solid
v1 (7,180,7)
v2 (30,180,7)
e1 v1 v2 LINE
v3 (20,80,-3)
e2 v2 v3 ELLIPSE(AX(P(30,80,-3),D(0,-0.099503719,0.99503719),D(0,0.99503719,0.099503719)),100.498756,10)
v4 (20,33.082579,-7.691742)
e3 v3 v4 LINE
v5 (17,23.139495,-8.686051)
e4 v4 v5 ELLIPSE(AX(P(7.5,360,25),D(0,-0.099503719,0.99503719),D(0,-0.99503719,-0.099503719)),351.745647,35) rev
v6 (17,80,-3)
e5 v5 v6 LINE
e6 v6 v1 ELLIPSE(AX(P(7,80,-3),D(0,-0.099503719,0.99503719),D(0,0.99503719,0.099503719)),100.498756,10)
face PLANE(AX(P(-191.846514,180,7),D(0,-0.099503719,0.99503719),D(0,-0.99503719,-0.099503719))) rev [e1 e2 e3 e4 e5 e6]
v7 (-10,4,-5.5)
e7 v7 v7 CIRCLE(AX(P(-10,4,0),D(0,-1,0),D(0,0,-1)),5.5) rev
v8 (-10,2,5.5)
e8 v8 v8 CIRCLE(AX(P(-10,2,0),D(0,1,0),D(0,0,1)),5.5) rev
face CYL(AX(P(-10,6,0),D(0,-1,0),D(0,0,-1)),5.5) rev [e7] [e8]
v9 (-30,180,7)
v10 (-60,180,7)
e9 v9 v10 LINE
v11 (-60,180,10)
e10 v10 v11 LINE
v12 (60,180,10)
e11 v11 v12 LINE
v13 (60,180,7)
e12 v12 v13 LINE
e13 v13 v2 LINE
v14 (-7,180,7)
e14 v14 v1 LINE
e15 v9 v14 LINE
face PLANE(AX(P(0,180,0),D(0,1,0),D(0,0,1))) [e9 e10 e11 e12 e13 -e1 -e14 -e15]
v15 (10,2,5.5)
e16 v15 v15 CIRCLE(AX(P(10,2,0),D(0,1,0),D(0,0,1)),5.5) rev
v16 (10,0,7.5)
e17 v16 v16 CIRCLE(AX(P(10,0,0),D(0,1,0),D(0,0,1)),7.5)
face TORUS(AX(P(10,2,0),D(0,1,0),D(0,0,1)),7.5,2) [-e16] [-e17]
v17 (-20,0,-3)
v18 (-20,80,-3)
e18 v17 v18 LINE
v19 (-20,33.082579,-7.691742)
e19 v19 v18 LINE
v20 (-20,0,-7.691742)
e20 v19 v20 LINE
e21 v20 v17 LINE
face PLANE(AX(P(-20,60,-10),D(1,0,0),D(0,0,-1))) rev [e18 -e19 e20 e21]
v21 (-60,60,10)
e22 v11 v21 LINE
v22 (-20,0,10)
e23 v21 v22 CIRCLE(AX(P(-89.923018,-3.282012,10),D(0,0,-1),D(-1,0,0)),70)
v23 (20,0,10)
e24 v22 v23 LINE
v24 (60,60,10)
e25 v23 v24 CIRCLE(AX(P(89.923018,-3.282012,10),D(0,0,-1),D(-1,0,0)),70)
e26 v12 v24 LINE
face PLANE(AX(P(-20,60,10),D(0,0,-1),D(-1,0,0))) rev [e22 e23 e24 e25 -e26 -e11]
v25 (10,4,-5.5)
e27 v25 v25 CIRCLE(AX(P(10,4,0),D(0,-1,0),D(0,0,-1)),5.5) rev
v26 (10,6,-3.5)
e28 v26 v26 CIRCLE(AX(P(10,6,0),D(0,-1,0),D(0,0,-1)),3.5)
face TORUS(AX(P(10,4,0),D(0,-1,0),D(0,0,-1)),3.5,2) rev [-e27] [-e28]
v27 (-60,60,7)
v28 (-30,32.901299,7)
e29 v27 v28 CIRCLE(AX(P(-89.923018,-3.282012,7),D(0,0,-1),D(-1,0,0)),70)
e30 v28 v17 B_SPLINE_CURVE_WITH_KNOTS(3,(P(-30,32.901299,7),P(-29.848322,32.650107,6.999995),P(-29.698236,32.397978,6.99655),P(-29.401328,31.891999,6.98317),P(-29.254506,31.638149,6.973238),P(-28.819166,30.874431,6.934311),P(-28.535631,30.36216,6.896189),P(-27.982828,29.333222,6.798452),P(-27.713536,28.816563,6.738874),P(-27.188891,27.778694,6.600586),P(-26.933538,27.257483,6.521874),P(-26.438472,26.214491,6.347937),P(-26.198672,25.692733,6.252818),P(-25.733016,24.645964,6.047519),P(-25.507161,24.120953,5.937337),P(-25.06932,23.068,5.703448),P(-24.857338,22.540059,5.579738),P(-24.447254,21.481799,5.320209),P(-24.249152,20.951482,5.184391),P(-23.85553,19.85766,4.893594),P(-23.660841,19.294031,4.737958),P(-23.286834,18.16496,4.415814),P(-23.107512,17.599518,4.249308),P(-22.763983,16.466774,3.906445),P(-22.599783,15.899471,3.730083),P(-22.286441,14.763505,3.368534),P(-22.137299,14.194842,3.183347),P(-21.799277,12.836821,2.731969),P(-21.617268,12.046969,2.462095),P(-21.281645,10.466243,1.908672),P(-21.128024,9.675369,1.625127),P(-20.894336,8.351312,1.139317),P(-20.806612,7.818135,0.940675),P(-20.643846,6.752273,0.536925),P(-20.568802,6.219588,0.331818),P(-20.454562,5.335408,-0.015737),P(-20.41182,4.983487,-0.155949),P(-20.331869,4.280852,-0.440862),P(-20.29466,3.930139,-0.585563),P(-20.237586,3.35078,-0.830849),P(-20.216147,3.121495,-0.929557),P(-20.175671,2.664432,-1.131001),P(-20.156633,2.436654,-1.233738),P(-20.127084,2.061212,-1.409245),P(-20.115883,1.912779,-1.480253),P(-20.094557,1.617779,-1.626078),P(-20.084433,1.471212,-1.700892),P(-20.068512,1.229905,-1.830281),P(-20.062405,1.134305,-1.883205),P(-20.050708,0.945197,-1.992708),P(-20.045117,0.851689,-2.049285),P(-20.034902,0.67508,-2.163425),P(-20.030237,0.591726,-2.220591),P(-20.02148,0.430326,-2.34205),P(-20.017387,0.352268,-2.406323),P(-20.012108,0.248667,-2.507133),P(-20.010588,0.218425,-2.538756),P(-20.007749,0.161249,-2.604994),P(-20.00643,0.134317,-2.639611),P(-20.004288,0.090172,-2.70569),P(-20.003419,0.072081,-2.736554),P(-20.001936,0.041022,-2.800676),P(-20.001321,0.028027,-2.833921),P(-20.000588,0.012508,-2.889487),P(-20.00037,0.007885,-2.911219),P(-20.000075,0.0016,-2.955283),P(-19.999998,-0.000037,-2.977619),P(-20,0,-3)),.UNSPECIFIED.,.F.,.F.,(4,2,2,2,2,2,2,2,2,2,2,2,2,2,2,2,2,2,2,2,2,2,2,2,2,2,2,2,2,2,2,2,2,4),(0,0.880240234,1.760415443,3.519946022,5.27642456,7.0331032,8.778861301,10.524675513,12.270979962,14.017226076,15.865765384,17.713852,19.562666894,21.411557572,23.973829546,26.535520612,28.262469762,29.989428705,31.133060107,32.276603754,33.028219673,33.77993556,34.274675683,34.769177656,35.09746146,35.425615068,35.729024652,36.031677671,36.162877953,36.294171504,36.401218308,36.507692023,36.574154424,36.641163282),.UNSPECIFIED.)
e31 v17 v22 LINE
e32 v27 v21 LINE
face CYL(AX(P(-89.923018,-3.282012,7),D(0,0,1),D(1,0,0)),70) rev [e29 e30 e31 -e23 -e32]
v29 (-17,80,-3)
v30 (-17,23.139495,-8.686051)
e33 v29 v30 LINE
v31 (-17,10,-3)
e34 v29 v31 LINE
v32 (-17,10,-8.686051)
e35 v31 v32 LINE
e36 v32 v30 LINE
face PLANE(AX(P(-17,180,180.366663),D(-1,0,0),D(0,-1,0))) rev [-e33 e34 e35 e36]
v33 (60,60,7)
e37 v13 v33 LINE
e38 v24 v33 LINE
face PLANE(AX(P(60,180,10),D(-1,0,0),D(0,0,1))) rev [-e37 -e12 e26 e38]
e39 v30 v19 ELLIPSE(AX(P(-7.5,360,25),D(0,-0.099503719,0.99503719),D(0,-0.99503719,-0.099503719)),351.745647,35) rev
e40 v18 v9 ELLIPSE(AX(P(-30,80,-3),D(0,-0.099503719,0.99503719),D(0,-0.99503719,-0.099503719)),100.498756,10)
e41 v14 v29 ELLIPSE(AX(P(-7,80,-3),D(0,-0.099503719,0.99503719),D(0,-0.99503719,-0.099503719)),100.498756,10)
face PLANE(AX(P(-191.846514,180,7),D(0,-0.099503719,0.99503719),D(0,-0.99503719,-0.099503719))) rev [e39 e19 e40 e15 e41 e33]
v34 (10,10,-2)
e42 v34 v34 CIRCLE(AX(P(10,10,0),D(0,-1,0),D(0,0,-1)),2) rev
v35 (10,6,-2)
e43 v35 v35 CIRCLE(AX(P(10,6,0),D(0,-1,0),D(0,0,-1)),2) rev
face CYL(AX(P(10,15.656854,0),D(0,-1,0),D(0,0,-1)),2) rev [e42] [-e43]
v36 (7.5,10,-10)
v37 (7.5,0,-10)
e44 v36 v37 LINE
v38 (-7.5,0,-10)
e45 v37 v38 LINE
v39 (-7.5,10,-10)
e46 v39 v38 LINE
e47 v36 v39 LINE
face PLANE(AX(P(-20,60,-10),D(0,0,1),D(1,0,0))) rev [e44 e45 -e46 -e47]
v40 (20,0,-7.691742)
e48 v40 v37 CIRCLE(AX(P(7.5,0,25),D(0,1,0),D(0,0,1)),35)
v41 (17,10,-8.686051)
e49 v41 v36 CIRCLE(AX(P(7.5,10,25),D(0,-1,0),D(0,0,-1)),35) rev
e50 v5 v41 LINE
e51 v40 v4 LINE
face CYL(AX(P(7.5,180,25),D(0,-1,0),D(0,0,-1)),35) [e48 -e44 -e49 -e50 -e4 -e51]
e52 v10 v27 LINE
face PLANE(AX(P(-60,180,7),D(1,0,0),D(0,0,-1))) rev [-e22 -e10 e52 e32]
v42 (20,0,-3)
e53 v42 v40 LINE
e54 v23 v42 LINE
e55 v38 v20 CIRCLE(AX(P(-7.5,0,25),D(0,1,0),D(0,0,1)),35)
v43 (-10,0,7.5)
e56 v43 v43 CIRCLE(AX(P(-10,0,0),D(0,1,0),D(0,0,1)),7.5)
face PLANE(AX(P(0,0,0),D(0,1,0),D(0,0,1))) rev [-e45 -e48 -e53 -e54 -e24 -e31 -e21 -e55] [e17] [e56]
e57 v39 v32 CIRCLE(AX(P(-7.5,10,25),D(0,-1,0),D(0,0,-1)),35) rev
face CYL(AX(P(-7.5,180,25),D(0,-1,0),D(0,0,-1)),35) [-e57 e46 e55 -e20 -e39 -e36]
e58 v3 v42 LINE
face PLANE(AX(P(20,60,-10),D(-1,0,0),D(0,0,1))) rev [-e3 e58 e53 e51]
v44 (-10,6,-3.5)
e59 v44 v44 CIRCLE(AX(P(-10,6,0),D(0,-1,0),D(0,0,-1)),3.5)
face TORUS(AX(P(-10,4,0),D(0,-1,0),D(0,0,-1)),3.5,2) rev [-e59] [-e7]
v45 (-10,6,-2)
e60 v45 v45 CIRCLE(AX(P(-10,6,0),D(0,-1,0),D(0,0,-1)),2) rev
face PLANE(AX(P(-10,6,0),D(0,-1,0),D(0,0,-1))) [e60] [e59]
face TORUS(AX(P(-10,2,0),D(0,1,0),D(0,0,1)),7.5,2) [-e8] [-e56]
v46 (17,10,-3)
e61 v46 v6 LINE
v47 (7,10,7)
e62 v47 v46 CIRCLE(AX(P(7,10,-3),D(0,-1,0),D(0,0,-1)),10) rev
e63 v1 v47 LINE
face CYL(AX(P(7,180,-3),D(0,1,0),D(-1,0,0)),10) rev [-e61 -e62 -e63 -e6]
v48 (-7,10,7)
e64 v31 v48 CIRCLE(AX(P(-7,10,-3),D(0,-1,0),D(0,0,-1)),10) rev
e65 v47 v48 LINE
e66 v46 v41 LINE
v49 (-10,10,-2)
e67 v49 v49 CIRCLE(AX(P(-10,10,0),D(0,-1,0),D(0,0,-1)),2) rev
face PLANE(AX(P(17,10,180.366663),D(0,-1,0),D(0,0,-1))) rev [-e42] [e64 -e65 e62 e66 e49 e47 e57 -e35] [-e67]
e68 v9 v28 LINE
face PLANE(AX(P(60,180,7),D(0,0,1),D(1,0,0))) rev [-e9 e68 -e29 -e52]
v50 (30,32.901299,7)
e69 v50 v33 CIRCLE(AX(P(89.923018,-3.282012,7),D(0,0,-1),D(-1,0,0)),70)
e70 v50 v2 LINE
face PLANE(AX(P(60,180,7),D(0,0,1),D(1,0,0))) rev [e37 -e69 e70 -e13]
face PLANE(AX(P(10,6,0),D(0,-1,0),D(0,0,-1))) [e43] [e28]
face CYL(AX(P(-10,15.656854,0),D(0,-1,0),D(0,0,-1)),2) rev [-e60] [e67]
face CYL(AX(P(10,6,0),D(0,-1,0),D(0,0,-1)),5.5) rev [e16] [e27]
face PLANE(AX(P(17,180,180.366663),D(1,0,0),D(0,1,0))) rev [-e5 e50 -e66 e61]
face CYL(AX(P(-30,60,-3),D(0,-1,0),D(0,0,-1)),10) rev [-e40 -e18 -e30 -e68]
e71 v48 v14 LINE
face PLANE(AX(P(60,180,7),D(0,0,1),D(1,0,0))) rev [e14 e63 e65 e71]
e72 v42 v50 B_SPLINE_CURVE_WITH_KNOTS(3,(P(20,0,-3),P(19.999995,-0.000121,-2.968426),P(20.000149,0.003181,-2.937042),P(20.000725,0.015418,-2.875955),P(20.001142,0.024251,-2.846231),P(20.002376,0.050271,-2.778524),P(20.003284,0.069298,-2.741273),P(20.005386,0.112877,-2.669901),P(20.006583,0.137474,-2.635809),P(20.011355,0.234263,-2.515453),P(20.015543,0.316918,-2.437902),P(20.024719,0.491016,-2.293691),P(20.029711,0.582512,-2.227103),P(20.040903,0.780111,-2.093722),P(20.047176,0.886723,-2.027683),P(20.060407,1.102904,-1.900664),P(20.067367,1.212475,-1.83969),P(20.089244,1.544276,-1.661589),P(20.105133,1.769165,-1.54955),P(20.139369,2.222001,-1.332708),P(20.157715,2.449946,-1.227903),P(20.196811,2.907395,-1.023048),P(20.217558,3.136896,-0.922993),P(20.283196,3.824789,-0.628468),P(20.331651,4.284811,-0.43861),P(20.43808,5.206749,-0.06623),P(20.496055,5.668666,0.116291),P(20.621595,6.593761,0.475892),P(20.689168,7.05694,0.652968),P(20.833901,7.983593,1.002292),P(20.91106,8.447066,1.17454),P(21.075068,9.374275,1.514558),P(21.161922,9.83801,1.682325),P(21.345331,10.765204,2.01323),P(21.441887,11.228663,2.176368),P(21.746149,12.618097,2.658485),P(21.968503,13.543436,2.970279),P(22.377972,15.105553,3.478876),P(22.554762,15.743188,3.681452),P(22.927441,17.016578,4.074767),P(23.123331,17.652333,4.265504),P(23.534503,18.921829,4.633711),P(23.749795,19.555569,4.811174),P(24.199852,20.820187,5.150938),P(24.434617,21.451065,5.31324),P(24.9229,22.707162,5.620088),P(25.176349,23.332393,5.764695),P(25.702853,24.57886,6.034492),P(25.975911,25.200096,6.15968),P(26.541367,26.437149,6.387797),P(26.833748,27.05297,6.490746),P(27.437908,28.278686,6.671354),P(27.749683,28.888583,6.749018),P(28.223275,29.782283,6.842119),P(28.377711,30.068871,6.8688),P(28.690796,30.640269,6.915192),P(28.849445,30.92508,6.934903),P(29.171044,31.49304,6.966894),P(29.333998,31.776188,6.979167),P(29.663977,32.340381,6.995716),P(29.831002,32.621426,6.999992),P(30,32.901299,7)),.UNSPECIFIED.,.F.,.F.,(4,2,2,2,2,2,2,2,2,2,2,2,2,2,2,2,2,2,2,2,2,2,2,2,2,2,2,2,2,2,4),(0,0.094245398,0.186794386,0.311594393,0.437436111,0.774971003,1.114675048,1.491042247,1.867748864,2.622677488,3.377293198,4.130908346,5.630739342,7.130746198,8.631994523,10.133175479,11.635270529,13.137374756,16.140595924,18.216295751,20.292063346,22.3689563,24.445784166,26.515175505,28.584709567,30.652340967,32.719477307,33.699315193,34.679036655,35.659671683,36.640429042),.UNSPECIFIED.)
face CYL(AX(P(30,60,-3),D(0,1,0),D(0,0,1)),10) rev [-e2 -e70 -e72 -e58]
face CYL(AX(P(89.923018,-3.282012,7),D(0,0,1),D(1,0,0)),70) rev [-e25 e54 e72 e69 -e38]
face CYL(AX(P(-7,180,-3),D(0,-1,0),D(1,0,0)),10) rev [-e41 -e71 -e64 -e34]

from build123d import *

# Parameters (mm, degrees)
SZKIC1_W                    = 40
SZKIC1_H                    = 20
DODANIE_WYCI_GNI_CIE1_DEPTH = 60
DODANIE_WYCI_GNI_CIE2_DEPTH = 120
DODANIE_WYCI_GNI_CIE3_DEPTH = 3
SZKIC4_W                    = 40
SZKIC4_H                    = 17
DODANIE_WYCI_GNI_CIE4_DEPTH = 120
WYTNIJ_WYCI_GNI_CIE1_DEPTH  = 40
SZKIC6_W                    = 34
SZKIC6_H                    = 170
WYTNIJ_WYCI_GNI_CIE2_DEPTH  = 17
ZAOKR_GLENIE1_R             = 10
SZKIC7_R                    = 2
WYTNIJ_WYCI_GNI_CIE3_DEPTH  = 10
SZKIC8_R                    = 5.5
WYTNIJ_WYCI_GNI_CIE4_DEPTH  = 6
ZAOKR_GLENIE2_R             = 2
WYTNIJ_WYCI_GNI_CIE5_DEPTH  = 191.000000132


with BuildPart() as part:
    # Szkic1 → Dodanie-wyciągnięcie1 (new body)
    with BuildSketch(Plane(origin=(0, 0, 0), x_dir=(1, 0, 0), z_dir=(0, 1, 0))):
        Rectangle(SZKIC1_W, SZKIC1_H)
    extrude(amount=DODANIE_WYCI_GNI_CIE1_DEPTH)

    # Szkic2 → Dodanie-wyciągnięcie2 (add)
    with BuildSketch(Plane(origin=(0, 60, 0), x_dir=(1, 0, 0), z_dir=(0, 1, 0))):
        Polygon((0, -10), (60, -10), (60, -7), (-60, -7), (-60, -10), align=None)
    extrude(amount=DODANIE_WYCI_GNI_CIE2_DEPTH)

    # Szkic3 → Dodanie-wyciągnięcie3 (add)
    with BuildSketch(Plane.XY.offset(10)):
        with BuildLine():
            Line((-60, 60), (-20, 60))
            Line((-20, 60), (-20, 0))
            ThreePointArc((-20, 0), (-31.679497057, 35.547001962), (-60, 60))
        make_face()
        with BuildLine():
            Line((60, 60), (20, 60))
            Line((20, 60), (20, 0))
            ThreePointArc((20, 0), (31.679497057, 35.547001962), (60, 60))
        make_face()
    extrude(amount=-DODANIE_WYCI_GNI_CIE3_DEPTH)

    # Szkic4 → Dodanie-wyciągnięcie4 (add)
    with BuildSketch(Plane(origin=(0, 60, 0), x_dir=(1, 0, 0), z_dir=(0, 1, 0))):
        with Locations((0, 1.5)):
            Rectangle(SZKIC4_W, SZKIC4_H)
    extrude(amount=DODANIE_WYCI_GNI_CIE4_DEPTH)

    # Szkic5 → Wytnij-wyciągnięcie1 (cut)
    with BuildSketch(Plane(origin=(20, 0, 0), x_dir=(0, 0, -1), z_dir=(1, 0, 0))):
        Polygon((-7, 180), (10, 10), (18.124176292, 10), (18.124176292, 180), align=None)
    extrude(amount=-WYTNIJ_WYCI_GNI_CIE1_DEPTH, mode=Mode.SUBTRACT)

    # Szkic6 → Wytnij-wyciągnięcie2 (cut)
    with BuildSketch(Plane(origin=(0, 0, -10), x_dir=(-1, 0, 0), z_dir=(0, 0, -1))):
        with Locations((0, 95)):
            Rectangle(SZKIC6_W, SZKIC6_H)
    extrude(amount=-WYTNIJ_WYCI_GNI_CIE2_DEPTH, mode=Mode.SUBTRACT)

    # Zaokrąglenie1
    # the kernel refuses this fillet: 10 mm, written as the material it adds along each edge
    with BuildSketch(Plane(origin=(-20, 0, 7), x_dir=(0, 0, -1), z_dir=(0, 1, 0))) as zaokr_glenie1_piece_1_section:
        with BuildLine():
            CenterArc((ZAOKR_GLENIE1_R, ZAOKR_GLENIE1_R), ZAOKR_GLENIE1_R, 180, 90)
            Line((0, ZAOKR_GLENIE1_R), (-ZAOKR_GLENIE1_R * 0.02, ZAOKR_GLENIE1_R))
            Line((-ZAOKR_GLENIE1_R * 0.02, ZAOKR_GLENIE1_R), (-ZAOKR_GLENIE1_R * 0.02, -ZAOKR_GLENIE1_R * 0.02))
            Line((-ZAOKR_GLENIE1_R * 0.02, -ZAOKR_GLENIE1_R * 0.02), (ZAOKR_GLENIE1_R, -ZAOKR_GLENIE1_R * 0.02))
            Line((ZAOKR_GLENIE1_R, -ZAOKR_GLENIE1_R * 0.02), (ZAOKR_GLENIE1_R, 0))
        make_face()
    zaokr_glenie1_piece_1 = extrude(amount=180, mode=Mode.PRIVATE)
    zaokr_glenie1_piece_1 = split(zaokr_glenie1_piece_1, bisect_by=Plane(origin=(-22.33425107, 87.013829457, -2.298617054), z_dir=(0, -0.09950371902099896, 0.9950371902099892)), keep=Keep.TOP, mode=Mode.PRIVATE)
    zaokr_glenie1_piece_1 = zaokr_glenie1_piece_1 - Plane(origin=(-89.92301766, -3.282011774, 4.977489049), x_dir=(0.9989002522895803, 0.04688588247876816, 0), z_dir=(0, 0, 1)) * Cylinder(70, 400, mode=Mode.PRIVATE)
    with BuildSketch(Plane(origin=(20, 180, 7), x_dir=(0, 0, -1), z_dir=(0, -1, 0))) as zaokr_glenie1_piece_2_section:
        with BuildLine():
            CenterArc((ZAOKR_GLENIE1_R, ZAOKR_GLENIE1_R), ZAOKR_GLENIE1_R, 180, 90)
            Line((0, ZAOKR_GLENIE1_R), (-ZAOKR_GLENIE1_R * 0.02, ZAOKR_GLENIE1_R))
            Line((-ZAOKR_GLENIE1_R * 0.02, ZAOKR_GLENIE1_R), (-ZAOKR_GLENIE1_R * 0.02, -ZAOKR_GLENIE1_R * 0.02))
            Line((-ZAOKR_GLENIE1_R * 0.02, -ZAOKR_GLENIE1_R * 0.02), (ZAOKR_GLENIE1_R, -ZAOKR_GLENIE1_R * 0.02))
            Line((ZAOKR_GLENIE1_R, -ZAOKR_GLENIE1_R * 0.02), (ZAOKR_GLENIE1_R, 0))
        make_face()
    zaokr_glenie1_piece_2 = extrude(amount=180, mode=Mode.PRIVATE)
    zaokr_glenie1_piece_2 = split(zaokr_glenie1_piece_2, bisect_by=Plane(origin=(22.33425107, 87.013829456, -2.298617054), z_dir=(0, -0.09950371902099896, 0.9950371902099892)), keep=Keep.TOP, mode=Mode.PRIVATE)
    zaokr_glenie1_piece_2 = zaokr_glenie1_piece_2 - Plane(origin=(89.92301766, -3.282011774, 4.977489049), x_dir=(-0.9989002522895803, 0.046885882478767064, 0), z_dir=(0, 0, 1)) * Cylinder(70, 400, mode=Mode.PRIVATE)
    with BuildSketch(Plane(origin=(-17, 180, 7), x_dir=(0, 0, -1), z_dir=(0, -1, 0))) as zaokr_glenie1_piece_3_section:
        with BuildLine():
            CenterArc((ZAOKR_GLENIE1_R, ZAOKR_GLENIE1_R), ZAOKR_GLENIE1_R, 180, 90)
            Line((0, ZAOKR_GLENIE1_R), (-ZAOKR_GLENIE1_R * 0.02, ZAOKR_GLENIE1_R))
            Line((-ZAOKR_GLENIE1_R * 0.02, ZAOKR_GLENIE1_R), (-ZAOKR_GLENIE1_R * 0.02, -ZAOKR_GLENIE1_R * 0.02))
            Line((-ZAOKR_GLENIE1_R * 0.02, -ZAOKR_GLENIE1_R * 0.02), (ZAOKR_GLENIE1_R, -ZAOKR_GLENIE1_R * 0.02))
            Line((ZAOKR_GLENIE1_R, -ZAOKR_GLENIE1_R * 0.02), (ZAOKR_GLENIE1_R, 0))
        make_face()
    zaokr_glenie1_piece_3 = extrude(amount=170, mode=Mode.PRIVATE)
    zaokr_glenie1_piece_3 = split(zaokr_glenie1_piece_3, bisect_by=Plane(origin=(-14.551056072, 85.950912881, -2.404908712), z_dir=(0, -0.09950371902099896, 0.9950371902099892)), keep=Keep.TOP, mode=Mode.PRIVATE)
    with BuildSketch(Plane(origin=(17, 10, 7), x_dir=(0, 0, -1), z_dir=(0, 1, 0))) as zaokr_glenie1_piece_4_section:
        with BuildLine():
            CenterArc((ZAOKR_GLENIE1_R, ZAOKR_GLENIE1_R), ZAOKR_GLENIE1_R, 180, 90)
            Line((0, ZAOKR_GLENIE1_R), (-ZAOKR_GLENIE1_R * 0.02, ZAOKR_GLENIE1_R))
            Line((-ZAOKR_GLENIE1_R * 0.02, ZAOKR_GLENIE1_R), (-ZAOKR_GLENIE1_R * 0.02, -ZAOKR_GLENIE1_R * 0.02))
            Line((-ZAOKR_GLENIE1_R * 0.02, -ZAOKR_GLENIE1_R * 0.02), (ZAOKR_GLENIE1_R, -ZAOKR_GLENIE1_R * 0.02))
            Line((ZAOKR_GLENIE1_R, -ZAOKR_GLENIE1_R * 0.02), (ZAOKR_GLENIE1_R, 0))
        make_face()
    zaokr_glenie1_piece_4 = extrude(amount=170, mode=Mode.PRIVATE)
    zaokr_glenie1_piece_4 = split(zaokr_glenie1_piece_4, bisect_by=Plane(origin=(14.551056072, 85.950912881, -2.404908712), z_dir=(0, -0.09950371902099896, 0.9950371902099892)), keep=Keep.TOP, mode=Mode.PRIVATE)
    add([zaokr_glenie1_piece_1, zaokr_glenie1_piece_2, zaokr_glenie1_piece_3, zaokr_glenie1_piece_4])

    # Szkic7 → Wytnij-wyciągnięcie3 (cut)
    with BuildSketch(Plane.XZ):
        with Locations(Location((-10, 0, 0), (0, 0, 270))):
            Circle(SZKIC7_R)
        with Locations(Location((10, 0, 0), (0, 0, 270))):
            Circle(SZKIC7_R)
    extrude(amount=-WYTNIJ_WYCI_GNI_CIE3_DEPTH, mode=Mode.SUBTRACT)

    # Szkic8 → Wytnij-wyciągnięcie4 (cut)
    with BuildSketch(Plane.XZ):
        with Locations(Location((-10, 0, 0), (0, 0, 270))):
            Circle(SZKIC8_R)
        with Locations(Location((10, 0, 0), (0, 0, 270))):
            Circle(SZKIC8_R)
    extrude(amount=-WYTNIJ_WYCI_GNI_CIE4_DEPTH, mode=Mode.SUBTRACT)

    # Zaokrąglenie2
    zaokr_glenie2_edges = [part.edges().sort_by_distance(p)[0] for p in [
        (-10, 0, 5.5),
        (-10, 6, 5.5),
        (10, 0, 5.5),
        (10, 6, 5.5),
    ]]
    fillet(zaokr_glenie2_edges, radius=ZAOKR_GLENIE2_R)

    # Szkic9 → Wytnij-wyciągnięcie5 (cut, through all)
    with BuildSketch(Plane.XZ):
        with BuildLine():
            Line((7.5, -10), (-7.5, -10))
            ThreePointArc((-7.5, -10), (-20.893920133, -7.335783638), (-32.248737342, 0.251262658))
            Line((-32.248737342, 0.251262658), (-32.248737342, -13.02318051))
            Line((-32.248737342, -13.02318051), (32.248737342, -13.02318051))
            Line((32.248737342, -13.02318051), (32.248737342, 0.251262658))
            ThreePointArc((32.248737342, 0.251262658), (20.893920133, -7.335783638), (7.5, -10))
        make_face()
    extrude(amount=-WYTNIJ_WYCI_GNI_CIE5_DEPTH, mode=Mode.SUBTRACT)


solid = part.part
